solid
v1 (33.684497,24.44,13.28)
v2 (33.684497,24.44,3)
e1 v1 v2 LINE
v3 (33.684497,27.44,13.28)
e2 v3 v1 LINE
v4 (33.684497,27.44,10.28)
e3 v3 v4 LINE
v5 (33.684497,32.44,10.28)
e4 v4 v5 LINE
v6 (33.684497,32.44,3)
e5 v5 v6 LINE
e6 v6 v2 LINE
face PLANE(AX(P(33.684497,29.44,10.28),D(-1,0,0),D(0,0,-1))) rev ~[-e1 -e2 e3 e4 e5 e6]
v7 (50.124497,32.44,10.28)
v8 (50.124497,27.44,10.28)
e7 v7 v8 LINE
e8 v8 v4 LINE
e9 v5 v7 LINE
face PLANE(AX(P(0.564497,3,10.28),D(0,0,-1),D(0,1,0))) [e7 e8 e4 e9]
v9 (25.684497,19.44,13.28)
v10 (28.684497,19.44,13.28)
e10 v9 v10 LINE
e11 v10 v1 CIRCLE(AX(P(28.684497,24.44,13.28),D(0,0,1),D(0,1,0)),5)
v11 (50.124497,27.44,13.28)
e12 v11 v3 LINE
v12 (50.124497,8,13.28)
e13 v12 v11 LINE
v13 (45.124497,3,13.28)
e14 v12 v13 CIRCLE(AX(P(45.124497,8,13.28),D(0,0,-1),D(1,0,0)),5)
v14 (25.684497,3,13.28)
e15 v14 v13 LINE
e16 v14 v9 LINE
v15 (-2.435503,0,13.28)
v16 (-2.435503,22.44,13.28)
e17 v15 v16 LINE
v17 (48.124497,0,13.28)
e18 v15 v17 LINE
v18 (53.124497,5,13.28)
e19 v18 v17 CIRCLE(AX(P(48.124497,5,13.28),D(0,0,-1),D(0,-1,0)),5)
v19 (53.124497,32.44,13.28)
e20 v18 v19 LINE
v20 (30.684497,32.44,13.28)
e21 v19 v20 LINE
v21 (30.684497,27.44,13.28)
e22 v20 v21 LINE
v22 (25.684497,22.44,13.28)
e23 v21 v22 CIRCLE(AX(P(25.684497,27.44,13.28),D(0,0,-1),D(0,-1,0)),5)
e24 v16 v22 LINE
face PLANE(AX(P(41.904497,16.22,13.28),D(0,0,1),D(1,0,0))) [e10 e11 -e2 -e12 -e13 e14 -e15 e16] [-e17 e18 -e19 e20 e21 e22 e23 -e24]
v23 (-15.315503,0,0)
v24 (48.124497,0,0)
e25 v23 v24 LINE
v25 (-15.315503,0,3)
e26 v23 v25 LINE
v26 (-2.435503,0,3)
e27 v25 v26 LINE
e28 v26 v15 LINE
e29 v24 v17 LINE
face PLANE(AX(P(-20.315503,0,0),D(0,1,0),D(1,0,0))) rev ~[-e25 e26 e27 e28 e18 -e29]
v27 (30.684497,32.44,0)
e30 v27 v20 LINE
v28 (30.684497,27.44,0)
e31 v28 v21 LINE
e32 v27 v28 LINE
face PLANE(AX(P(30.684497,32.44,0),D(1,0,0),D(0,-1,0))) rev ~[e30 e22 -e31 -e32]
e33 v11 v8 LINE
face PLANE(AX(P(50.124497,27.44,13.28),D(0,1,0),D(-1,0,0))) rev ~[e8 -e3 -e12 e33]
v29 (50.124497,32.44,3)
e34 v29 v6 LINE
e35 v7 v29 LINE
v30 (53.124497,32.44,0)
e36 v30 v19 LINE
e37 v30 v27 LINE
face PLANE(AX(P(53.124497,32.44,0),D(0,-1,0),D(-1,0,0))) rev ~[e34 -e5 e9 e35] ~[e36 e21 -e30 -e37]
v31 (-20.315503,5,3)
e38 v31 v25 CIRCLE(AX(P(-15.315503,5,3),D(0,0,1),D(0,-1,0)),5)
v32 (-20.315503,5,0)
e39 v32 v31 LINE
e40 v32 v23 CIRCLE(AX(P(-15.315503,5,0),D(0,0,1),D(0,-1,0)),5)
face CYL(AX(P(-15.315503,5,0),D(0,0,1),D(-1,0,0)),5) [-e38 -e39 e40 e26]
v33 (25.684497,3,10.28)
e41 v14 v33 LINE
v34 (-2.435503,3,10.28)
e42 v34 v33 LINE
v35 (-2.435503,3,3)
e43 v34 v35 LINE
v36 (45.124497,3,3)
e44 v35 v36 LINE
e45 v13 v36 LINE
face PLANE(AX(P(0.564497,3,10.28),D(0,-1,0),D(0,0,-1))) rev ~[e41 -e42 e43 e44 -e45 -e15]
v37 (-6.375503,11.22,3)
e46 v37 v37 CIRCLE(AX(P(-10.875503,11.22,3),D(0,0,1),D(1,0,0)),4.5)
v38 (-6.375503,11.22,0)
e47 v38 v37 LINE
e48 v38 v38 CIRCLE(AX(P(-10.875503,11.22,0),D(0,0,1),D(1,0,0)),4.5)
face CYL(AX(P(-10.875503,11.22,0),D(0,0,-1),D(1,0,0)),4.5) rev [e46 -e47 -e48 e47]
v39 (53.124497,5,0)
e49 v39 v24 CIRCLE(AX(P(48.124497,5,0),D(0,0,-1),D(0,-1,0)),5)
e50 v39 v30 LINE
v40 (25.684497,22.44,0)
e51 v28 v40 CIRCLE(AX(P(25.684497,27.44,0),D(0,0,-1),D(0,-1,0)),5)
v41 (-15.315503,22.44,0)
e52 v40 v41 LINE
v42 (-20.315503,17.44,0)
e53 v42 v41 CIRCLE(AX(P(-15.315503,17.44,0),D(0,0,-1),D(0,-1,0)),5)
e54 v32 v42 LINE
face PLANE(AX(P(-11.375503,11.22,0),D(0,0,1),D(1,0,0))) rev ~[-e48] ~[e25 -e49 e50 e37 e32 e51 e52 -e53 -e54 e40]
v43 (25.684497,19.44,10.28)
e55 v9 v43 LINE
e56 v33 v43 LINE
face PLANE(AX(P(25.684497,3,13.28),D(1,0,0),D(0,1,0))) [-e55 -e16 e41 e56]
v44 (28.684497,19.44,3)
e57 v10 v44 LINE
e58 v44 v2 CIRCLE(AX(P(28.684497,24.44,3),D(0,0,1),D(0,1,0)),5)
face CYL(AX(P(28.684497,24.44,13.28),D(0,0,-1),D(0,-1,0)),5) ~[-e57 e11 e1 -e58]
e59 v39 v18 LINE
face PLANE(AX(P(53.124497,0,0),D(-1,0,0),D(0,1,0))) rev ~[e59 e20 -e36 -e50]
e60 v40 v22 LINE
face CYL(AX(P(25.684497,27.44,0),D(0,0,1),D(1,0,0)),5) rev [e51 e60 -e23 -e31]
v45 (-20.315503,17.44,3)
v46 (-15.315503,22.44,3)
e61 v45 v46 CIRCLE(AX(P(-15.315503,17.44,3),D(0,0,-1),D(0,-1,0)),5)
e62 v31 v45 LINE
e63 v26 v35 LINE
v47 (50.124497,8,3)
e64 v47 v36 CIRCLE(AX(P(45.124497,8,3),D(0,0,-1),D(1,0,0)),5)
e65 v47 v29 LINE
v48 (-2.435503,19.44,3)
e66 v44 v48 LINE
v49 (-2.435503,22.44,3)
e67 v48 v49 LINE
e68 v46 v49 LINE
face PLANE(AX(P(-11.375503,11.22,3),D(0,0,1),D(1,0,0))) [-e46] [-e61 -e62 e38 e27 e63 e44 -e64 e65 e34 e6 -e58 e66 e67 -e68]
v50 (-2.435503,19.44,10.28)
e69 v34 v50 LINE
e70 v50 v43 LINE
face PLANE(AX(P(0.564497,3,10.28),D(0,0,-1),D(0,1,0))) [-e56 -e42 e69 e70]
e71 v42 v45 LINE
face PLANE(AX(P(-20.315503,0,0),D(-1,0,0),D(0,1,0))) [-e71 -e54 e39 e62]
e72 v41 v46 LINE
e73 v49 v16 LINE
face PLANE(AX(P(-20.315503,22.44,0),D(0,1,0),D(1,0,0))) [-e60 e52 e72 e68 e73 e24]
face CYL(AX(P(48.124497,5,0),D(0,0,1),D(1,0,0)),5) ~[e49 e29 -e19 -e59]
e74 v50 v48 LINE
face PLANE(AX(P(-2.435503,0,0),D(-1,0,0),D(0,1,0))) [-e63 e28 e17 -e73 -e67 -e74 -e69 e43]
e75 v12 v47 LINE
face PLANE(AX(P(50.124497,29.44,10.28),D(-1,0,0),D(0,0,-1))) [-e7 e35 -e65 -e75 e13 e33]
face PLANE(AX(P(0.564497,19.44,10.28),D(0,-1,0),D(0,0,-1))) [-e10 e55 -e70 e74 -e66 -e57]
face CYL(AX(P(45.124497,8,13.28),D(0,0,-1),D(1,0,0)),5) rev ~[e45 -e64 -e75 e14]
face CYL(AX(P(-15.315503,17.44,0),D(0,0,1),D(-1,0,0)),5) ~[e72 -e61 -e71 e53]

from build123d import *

# Parameters (mm, degrees)
F0_W     = 33.12
F0_H     = 22.44
F1_DEPTH = 13.28
F0_W_2   = 17.88
F0_R     = 4.5
F2_DEPTH = 3
F3_T     = -3
F4_W     = 8
F4_H     = 16.44
F5_DEPTH = 3
F6_R     = 5


# Not quite as in the source:
# - a shell that OpenCascade refuses in one call is made with other operations: the cavity is built on its own and cut out
# - a feature names something its author has since deleted; it is built from what else it names


with BuildPart() as f1:
    # F0 (on Top) → F1 (new body)
    with BuildSketch(Plane.XY):
        Polygon((30.6844967631, 22.44), (30.6844967631, 0), (53.1244967631, 0), (53.1244967631, 32.44), (30.6844967631, 32.44), align=None)
        with Locations((14.1244967631, 11.22)):
            Rectangle(F0_W, F0_H)
    extrude(amount=F1_DEPTH)

    # F0 (on Top) → F2 (join)
    with BuildSketch(Plane.XY):
        with Locations((-11.3755032369, 11.22)):
            Rectangle(F0_W_2, F0_H)
        with Locations((-10.8755032369, 11.22)):
            Circle(F0_R, mode=Mode.SUBTRACT)
    extrude(amount=F2_DEPTH)

    # F3: a shell. OpenCascade refuses it in one call, so the cavity is built on its own and cut out:
    # the body offset inwards by the wall thickness, plus a prism from it out through each open face.
    f3_core = offset(f1.part, amount=F3_T, kind=Kind.INTERSECTION, mode=Mode.PRIVATE)
    f3_exits = [f3_core.faces().sort_by_distance(p)[0] for p in [
        (0.564497, 11.22, 6.64),
        (41.904497, 29.44, 6.64),
    ]]
    add(f3_core, mode=Mode.SUBTRACT)
    extrude(f3_exits, amount=-F3_T, mode=Mode.SUBTRACT)

    # F4 (on face) → F5 (cut)
    with BuildSketch(Plane.XY.offset(13.28)):
        with Locations((29.6844967631, 11.22)):
            Rectangle(F4_W, F4_H)
        Polygon((50.1244967631, 27.44), (33.6844967631, 27.44), (33.6844967631, 19.44), (33.6844967631, 3), (50.1244967631, 3), align=None)
    extrude(amount=-F5_DEPTH, mode=Mode.SUBTRACT)

    # F6
    f6_edges = [f1.edges().sort_by_distance(p)[0] for p in [
        (53.124497, 0, 6.64),
        (30.684497, 22.44, 6.64),
        (33.684497, 19.44, 8.14),
        (50.124497, 3, 8.14),
        (-20.315503, 22.44, 1.5),
        (-20.315503, 0, 1.5),
    ]]
    fillet(f6_edges, radius=F6_R)


solid = f1.part
